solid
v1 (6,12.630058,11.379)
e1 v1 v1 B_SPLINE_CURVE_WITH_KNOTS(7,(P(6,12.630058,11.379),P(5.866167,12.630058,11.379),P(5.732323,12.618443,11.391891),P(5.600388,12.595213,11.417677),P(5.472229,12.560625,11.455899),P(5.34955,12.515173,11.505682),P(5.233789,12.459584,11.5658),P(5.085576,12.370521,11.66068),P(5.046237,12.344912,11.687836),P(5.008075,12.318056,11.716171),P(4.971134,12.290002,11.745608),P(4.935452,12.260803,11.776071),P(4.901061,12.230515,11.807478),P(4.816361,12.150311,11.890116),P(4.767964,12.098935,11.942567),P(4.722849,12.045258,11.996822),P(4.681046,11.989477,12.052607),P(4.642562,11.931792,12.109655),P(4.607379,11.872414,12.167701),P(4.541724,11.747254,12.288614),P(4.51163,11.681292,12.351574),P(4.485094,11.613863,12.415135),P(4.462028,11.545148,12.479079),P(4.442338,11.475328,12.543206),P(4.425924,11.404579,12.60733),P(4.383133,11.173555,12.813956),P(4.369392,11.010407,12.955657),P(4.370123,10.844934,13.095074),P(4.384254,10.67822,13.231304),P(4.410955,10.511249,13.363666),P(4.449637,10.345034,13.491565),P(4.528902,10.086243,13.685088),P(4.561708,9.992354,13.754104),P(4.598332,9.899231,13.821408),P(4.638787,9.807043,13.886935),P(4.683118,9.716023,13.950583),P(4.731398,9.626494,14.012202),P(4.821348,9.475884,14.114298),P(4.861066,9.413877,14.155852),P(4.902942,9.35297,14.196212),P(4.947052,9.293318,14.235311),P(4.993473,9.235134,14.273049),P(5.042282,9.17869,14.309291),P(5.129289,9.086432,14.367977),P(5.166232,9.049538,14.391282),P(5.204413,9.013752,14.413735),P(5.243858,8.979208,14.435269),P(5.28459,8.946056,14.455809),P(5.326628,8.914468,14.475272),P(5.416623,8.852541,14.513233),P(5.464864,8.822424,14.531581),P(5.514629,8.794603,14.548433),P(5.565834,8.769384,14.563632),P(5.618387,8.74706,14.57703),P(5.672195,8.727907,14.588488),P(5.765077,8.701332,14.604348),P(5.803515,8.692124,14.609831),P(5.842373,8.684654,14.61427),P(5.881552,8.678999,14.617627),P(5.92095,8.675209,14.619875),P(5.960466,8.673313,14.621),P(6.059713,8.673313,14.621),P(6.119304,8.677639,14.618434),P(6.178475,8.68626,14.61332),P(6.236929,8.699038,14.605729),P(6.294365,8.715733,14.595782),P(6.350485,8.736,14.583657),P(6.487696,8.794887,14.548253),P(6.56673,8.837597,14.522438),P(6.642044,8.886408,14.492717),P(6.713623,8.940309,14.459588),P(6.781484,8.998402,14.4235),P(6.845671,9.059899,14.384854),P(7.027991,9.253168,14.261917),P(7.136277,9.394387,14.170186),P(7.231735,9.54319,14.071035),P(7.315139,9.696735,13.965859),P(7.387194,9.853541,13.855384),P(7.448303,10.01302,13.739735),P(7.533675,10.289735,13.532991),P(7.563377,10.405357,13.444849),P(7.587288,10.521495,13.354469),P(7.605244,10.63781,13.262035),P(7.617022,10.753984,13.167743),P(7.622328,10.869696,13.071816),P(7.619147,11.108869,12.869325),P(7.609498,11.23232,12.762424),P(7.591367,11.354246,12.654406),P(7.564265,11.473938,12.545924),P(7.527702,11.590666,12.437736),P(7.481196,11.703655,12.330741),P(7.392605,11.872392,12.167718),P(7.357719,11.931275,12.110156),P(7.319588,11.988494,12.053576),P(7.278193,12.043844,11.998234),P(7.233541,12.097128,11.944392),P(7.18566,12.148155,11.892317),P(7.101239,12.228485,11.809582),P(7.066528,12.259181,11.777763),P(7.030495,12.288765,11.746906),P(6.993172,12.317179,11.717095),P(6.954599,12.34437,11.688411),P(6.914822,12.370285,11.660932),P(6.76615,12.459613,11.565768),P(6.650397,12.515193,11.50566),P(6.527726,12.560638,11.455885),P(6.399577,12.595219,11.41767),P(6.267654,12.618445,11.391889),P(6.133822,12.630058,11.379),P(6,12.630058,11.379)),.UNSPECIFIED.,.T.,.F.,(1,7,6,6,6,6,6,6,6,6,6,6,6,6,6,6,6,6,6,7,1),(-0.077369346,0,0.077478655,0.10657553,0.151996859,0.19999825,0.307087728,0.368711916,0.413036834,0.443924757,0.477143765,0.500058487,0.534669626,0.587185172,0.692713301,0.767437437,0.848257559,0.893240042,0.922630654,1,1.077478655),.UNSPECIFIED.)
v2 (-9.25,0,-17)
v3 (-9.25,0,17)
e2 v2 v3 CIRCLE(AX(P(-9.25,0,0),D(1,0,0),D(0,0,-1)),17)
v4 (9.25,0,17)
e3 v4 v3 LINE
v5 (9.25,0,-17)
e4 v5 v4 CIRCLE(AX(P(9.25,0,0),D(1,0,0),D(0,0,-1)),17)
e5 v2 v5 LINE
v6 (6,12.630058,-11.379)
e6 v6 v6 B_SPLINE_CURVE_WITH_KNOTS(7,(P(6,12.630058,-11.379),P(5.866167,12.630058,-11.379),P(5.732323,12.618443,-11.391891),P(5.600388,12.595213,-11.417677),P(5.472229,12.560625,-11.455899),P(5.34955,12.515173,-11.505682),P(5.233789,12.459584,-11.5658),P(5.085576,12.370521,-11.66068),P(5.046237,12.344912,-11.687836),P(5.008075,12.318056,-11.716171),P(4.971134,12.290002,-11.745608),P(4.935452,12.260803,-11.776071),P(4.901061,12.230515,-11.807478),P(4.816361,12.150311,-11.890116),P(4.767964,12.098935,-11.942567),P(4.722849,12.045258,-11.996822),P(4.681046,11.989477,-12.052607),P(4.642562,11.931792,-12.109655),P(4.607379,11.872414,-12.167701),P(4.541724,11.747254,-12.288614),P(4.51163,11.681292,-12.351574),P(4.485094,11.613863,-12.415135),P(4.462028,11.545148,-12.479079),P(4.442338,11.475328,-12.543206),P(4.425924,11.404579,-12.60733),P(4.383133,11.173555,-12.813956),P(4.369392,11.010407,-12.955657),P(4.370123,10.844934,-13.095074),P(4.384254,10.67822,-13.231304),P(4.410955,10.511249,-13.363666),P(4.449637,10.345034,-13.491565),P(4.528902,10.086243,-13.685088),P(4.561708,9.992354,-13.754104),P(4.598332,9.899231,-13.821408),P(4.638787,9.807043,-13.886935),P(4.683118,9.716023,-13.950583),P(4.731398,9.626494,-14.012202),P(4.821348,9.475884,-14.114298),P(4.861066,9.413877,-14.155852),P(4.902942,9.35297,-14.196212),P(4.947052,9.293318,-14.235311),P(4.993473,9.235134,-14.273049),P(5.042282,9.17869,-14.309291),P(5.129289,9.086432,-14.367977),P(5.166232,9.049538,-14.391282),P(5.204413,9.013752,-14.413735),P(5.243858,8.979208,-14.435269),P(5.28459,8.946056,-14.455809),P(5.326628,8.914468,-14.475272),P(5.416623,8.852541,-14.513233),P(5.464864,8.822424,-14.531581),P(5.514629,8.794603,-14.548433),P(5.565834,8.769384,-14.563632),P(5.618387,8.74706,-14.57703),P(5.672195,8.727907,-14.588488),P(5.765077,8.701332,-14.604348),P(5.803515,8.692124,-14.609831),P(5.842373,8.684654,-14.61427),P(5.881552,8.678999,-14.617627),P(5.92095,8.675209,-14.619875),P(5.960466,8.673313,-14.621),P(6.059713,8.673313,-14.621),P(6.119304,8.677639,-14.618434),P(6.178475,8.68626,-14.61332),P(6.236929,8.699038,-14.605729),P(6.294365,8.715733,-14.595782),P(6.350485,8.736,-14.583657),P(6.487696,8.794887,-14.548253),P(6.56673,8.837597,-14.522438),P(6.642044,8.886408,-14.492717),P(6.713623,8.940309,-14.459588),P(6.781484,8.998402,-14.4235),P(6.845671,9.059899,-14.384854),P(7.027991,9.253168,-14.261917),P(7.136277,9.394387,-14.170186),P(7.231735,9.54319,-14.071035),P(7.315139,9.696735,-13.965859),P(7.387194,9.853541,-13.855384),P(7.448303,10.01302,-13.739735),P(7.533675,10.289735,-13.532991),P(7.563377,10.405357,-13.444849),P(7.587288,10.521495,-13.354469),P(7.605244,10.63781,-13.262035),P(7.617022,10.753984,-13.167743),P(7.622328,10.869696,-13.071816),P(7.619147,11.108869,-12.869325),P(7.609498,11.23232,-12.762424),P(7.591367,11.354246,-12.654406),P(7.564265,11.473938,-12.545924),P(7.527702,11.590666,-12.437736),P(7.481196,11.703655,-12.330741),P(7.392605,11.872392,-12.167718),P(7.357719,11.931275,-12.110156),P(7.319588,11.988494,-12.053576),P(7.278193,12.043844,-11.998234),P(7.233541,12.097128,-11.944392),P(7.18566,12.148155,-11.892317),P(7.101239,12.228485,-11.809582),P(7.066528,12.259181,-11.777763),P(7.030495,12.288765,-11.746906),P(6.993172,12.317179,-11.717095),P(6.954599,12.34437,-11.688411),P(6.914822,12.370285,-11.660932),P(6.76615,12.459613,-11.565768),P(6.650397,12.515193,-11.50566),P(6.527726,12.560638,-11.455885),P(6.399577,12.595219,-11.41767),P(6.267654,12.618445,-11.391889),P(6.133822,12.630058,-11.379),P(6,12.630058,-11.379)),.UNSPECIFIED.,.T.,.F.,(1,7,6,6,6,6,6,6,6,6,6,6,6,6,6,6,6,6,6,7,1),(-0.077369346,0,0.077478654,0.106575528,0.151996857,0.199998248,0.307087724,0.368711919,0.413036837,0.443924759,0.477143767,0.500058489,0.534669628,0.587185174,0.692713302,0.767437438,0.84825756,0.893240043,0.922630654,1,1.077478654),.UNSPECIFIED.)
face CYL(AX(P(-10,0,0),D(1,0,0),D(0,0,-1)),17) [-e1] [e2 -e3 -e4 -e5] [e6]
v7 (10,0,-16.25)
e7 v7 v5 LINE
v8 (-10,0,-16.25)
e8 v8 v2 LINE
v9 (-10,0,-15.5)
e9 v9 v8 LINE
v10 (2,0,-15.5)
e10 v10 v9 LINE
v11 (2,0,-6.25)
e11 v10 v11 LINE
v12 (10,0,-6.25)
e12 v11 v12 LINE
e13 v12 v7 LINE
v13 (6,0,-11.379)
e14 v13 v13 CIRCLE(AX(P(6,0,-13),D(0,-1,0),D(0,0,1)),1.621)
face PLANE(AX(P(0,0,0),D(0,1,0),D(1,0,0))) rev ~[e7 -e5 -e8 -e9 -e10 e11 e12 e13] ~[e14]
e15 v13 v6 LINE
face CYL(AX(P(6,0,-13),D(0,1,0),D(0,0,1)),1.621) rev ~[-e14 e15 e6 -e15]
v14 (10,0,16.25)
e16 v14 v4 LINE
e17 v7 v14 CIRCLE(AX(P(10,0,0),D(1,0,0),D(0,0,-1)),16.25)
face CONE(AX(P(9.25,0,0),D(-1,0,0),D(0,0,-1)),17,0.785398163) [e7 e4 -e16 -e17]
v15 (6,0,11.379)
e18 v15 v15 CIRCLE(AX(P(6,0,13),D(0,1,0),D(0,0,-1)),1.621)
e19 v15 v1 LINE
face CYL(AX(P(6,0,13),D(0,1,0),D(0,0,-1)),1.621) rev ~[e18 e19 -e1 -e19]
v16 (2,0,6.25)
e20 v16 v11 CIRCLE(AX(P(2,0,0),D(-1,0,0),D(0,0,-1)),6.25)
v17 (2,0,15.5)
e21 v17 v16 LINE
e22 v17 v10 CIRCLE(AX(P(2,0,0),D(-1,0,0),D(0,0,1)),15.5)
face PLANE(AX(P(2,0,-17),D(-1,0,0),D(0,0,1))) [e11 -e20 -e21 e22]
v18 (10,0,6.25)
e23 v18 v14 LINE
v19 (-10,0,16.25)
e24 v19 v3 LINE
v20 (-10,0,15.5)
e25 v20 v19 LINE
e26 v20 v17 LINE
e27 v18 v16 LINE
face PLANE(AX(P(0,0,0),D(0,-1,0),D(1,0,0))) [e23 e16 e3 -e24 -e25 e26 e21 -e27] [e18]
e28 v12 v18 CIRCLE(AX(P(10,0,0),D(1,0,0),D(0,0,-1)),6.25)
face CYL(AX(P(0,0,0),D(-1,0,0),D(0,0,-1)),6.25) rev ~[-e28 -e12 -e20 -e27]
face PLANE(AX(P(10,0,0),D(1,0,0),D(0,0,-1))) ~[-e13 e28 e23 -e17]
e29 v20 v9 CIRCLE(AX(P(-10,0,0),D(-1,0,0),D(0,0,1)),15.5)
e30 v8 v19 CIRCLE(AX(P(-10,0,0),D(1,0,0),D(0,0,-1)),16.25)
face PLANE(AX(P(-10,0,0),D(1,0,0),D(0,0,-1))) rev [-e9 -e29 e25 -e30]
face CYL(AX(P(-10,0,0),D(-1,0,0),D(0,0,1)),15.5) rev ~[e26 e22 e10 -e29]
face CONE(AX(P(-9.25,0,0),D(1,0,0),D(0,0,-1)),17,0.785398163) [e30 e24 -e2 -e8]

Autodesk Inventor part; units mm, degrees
ref_plane "YZ Plane" through (0, 0, 0) normal (1, 0, 0) x (0, 1, 0)
ref_plane "XZ Plane" through (0, 0, 0) normal (0, 1, 0) x (-1, 0, 0)
ref_plane "XY Plane" through (0, 0, 0) normal (0, 0, 1) x (1, 0, 0)
sketch "スケッチ1" plane through (0, 0, 0) normal (0, 0, 1) x (1, 0, 0)
  line L0 (0, 0) -> (0, 6.25) construction
  line L1 (0, 6.25) -> (-10, 6.25)
  line L2 (-10, 6.25) -> (-10, 17)
  line L3 (-10, 17) -> (0, 17)
  line L4 (0, 6.25) -> (10, 6.25)
  line L5 (10, 6.25) -> (10, 17)
  line L6 (10, 17) -> (0, 17)
  line L7 (-14, 0) -> (14, 0) projected
  dimension "d0" = 6.25
  dimension "d1" = 10
  dimension "d2" = 10.75
revolve "回転1" add sketch "スケッチ1" angle 180 mid plane about axis through (-10, 0, 0) along (1, 0, 0)
sketch "スケッチ2" plane through (-10, 0, 17) normal (0, -1, 0) x (1, 0, 0)
  line L0 (20, 0) -> (0, 0) projected
  line L1 (20, -10.75) -> (20, 0) projected
  point P0 (10, -17)
  point P1 (16, -4)
  dimension "d4" = 4
  dimension "d5" = 4
hole "穴1" at (6, 0, 13) direction (0, 1, 0) diameter 3.242 end through all thread size "M4x0.7" class "6H" standard "ANSI Metric M Profile"
mirror "ミラー1" about plane through (0, 0, 0) normal (0, 0, 1) of "穴1"
sketch "スケッチ3" plane through (-10, 0, -17) normal (-1, 0, 0) x (0, 0, 1)
  circle A0 centre (17, 0) radius 15.5
  dimension "d16" = 31
extrude "押し出し1" cut sketch "スケッチ3" against normal blind 12
chamfer "面取り2" distance 0.75 angle 45 2 edges at (10, 17, 0) (-10, 17, 0)
properties part number "probe-cover" material "ステンレス鋼"
